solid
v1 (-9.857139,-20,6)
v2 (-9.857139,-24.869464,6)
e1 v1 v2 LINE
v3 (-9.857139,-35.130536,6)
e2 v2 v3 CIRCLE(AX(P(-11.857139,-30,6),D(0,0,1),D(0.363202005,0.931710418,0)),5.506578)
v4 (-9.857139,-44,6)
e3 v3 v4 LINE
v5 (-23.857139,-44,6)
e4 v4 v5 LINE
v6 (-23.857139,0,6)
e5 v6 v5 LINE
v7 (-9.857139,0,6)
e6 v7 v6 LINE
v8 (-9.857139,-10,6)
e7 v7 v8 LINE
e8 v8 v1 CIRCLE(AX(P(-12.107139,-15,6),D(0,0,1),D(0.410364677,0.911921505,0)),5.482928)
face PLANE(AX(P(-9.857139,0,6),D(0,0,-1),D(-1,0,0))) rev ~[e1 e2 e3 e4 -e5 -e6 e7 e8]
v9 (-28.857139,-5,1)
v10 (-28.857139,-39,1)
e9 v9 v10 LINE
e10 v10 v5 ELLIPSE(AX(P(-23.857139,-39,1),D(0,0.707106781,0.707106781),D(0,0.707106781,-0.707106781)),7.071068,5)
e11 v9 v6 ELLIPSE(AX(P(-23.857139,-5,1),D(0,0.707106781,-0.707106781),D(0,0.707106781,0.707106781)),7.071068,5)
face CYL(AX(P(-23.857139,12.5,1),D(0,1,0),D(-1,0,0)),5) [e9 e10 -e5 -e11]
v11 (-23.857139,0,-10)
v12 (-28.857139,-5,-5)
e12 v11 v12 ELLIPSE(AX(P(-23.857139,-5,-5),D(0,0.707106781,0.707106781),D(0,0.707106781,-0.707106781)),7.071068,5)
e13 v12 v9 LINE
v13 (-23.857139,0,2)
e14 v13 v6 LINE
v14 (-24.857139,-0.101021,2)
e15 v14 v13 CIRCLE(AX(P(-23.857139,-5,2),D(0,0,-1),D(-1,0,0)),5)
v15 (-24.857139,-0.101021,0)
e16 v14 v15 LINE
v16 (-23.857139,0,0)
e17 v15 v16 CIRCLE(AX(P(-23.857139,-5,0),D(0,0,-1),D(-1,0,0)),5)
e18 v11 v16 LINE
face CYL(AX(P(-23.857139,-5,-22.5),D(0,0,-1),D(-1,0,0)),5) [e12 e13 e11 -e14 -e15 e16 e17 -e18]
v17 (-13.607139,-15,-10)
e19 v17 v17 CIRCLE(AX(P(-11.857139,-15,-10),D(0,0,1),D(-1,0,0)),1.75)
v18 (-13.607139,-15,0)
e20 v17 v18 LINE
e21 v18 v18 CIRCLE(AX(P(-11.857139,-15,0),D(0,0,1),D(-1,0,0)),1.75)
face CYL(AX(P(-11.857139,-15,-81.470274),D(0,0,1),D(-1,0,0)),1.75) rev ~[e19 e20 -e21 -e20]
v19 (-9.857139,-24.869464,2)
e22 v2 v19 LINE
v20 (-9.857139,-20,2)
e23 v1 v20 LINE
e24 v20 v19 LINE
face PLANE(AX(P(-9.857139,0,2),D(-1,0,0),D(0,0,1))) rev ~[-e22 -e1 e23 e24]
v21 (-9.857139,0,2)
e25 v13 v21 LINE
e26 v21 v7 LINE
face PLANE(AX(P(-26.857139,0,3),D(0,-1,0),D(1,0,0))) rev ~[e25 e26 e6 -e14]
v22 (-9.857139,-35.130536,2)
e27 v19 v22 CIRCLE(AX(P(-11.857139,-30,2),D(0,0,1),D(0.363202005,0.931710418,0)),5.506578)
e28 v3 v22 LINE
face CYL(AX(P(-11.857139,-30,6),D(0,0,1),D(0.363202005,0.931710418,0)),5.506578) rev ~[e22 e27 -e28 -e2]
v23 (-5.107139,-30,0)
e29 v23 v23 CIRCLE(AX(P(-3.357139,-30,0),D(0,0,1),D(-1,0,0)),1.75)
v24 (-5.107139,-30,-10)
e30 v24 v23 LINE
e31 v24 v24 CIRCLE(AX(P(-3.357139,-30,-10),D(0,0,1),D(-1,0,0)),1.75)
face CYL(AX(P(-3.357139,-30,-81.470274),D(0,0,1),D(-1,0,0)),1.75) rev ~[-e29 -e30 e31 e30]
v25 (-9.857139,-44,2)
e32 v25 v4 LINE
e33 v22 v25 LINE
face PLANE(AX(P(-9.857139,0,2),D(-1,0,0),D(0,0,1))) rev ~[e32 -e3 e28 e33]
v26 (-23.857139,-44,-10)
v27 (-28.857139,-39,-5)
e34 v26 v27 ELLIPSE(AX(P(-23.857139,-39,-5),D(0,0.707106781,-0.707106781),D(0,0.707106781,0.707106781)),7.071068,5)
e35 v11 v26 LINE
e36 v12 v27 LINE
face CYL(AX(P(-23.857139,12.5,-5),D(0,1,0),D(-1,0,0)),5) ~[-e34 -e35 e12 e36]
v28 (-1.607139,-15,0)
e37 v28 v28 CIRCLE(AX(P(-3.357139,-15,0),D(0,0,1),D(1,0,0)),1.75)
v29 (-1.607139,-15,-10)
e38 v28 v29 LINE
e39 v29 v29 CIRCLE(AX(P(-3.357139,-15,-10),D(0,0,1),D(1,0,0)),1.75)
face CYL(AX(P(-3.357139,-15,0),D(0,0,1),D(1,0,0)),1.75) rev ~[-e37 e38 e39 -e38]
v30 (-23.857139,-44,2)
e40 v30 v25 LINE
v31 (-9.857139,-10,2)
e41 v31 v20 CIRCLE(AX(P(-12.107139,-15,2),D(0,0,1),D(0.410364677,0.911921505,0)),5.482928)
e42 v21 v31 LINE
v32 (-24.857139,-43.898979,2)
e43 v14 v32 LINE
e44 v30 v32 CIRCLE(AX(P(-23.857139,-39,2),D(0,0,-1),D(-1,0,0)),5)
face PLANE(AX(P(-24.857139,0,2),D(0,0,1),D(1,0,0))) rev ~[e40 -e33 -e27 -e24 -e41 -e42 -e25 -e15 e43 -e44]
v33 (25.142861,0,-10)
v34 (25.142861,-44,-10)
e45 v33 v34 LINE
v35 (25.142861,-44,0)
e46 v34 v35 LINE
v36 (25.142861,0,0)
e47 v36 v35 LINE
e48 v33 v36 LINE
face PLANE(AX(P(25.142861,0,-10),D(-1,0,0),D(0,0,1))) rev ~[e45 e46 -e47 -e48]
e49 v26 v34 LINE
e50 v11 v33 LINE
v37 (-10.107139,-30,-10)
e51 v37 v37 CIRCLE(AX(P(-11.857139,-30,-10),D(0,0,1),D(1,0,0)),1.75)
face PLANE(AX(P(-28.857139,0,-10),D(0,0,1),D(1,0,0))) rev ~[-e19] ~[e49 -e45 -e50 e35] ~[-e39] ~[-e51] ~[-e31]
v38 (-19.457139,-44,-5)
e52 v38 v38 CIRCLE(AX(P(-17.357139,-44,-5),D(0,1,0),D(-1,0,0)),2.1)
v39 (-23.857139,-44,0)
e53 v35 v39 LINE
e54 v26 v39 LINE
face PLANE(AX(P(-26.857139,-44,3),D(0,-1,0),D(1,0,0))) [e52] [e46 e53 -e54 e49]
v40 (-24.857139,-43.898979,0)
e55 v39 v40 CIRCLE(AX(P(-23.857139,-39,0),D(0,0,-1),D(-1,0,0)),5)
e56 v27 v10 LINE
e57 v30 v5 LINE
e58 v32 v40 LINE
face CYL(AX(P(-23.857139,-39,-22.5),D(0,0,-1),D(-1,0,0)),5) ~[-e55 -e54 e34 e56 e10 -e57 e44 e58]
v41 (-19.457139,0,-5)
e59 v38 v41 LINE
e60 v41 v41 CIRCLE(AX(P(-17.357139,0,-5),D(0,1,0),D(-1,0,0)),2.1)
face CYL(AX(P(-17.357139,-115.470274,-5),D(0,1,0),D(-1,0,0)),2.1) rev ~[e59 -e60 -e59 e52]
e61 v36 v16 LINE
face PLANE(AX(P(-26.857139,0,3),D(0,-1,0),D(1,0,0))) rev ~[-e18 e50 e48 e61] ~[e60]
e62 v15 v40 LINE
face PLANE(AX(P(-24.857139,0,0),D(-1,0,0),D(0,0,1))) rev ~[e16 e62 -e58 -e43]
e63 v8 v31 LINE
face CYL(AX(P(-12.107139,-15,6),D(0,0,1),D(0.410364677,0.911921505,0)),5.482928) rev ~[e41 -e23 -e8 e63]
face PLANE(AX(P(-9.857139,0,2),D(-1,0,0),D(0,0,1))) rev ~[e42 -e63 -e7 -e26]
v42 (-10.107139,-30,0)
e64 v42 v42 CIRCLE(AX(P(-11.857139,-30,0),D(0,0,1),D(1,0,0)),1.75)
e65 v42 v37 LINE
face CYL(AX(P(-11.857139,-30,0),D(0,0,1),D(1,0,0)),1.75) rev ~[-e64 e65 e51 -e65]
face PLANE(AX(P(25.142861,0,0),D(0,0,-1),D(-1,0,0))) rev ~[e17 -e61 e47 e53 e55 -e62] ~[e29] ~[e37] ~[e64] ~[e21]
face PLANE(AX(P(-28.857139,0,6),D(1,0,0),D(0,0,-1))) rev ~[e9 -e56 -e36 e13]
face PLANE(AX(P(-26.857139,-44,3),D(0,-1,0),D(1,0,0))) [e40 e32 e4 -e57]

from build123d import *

# Parameters (mm, degrees)
F0_W         = 15
F0_H         = 4
F1_DEPTH     = 44
F3_D         = 3.5
F4_R         = 1.75
F5_DEPTH     = 4
F7_D         = 4.2
F9_D         = 3.5
F9_DEPTH     = 10.001
F11_DEPTH    = 4
F12_T1_DEPTH = 69
F12_T3_DEPTH = 41


# Not quite as in the source:
# - a fillet or chamfer that OpenCascade refuses, or shapes differently, is made with other operations: its cross-section is extruded or revolved along the edge and cut away or added


with BuildPart() as f1:
    # F0 (on Front) → F1 (new body)
    with BuildSketch(Plane.XZ):
        Polygon((-28.8571389138, 6), (-28.8571389138, 0), (-24.8571389138, 0), (-24.8571389138, 2), (-24.8571389138, 6), align=None)
        Polygon((-24.8571389138, 0), (-28.8571389138, 0), (-28.8571389138, -10), (25.1428610862, -10), (25.1428610862, 0), align=None)
        with Locations((-17.3571389138, 4)):
            Rectangle(F0_W, F0_H)
    extrude(amount=F1_DEPTH)

    # F3 (through all)
    with Locations(Plane(origin=(0, 0, -10), x_dir=(1, 0, 0), z_dir=(0, 0, -1))):
        with Locations((-11.8571389138, 15), (-3.3571389138, 30)):
            Hole(F3_D / 2)

    # F4 (on face) → F5 (cut)
    with BuildSketch(Plane.XY.offset(6)):
        with BuildLine():
            Line((-9.8571389138, -20), (-9.8571389138, -10))
            ThreePointArc((-9.8571389138, -10), (-17.5900669637, -15), (-9.8571389138, -20))
        make_face()
        with Locations((-11.8571389138, -15)):
            Circle(F4_R, mode=Mode.SUBTRACT)
    extrude(amount=-F5_DEPTH, mode=Mode.SUBTRACT)

    # F7 (through all)
    with Locations(Plane.XZ.offset(44)):
        with Locations((-17.3571389138, -5)):
            Hole(F7_D / 2)

    # F9 (through all, one way)
    with BuildSketch(Plane.XY):
        with Locations((-3.3571389138, -15), (-11.8571389138, -30)):
            Circle(F9_D / 2)
    extrude(amount=-F9_DEPTH, mode=Mode.SUBTRACT)

    # F10 (on face) → F11 (cut, through all)
    with BuildSketch(Plane.XY.offset(6)):
        with BuildLine():
            Line((-9.8571389138, -35.1305356622), (-9.8571389138, -24.8694643378))
            ThreePointArc((-9.8571389138, -24.8694643378), (-17.3637164517, -30), (-9.8571389138, -35.1305356622))
        make_face()
    extrude(amount=-F11_DEPTH, mode=Mode.SUBTRACT)

    # F12: fillet of radius 5 on 4 edges, made by hand

    # F12_s2 → F12_t1 (cut)
    with BuildSketch(Plane.XZ.offset(-12.5)):
        with BuildLine():
            ThreePointArc((-28.8571389138, 1), (-27.3926728198, 4.5355339059), (-23.8571389138, 6))
            Line((-23.8571389138, 6), (-28.8571389138, 6))
            Line((-28.8571389138, 6), (-28.8571389138, 1))
        make_face()
        with BuildLine():
            ThreePointArc((-28.8571389138, -5), (-27.3926728198, -8.5355339059), (-23.8571389138, -10))
            Line((-23.8571389138, -10), (-28.8571389138, -10))
            Line((-28.8571389138, -10), (-28.8571389138, -5))
        make_face()
    extrude(amount=F12_T1_DEPTH, mode=Mode.SUBTRACT)

    # F12_s4 → F12_t3 (cut)
    with BuildSketch(Plane.XY.offset(-22.5)):
        with BuildLine():
            ThreePointArc((-28.8571389138, -5), (-27.3926728198, -1.4644660941), (-23.8571389138, 0))
            Line((-23.8571389138, 0), (-28.8571389138, 0))
            Line((-28.8571389138, 0), (-28.8571389138, -5))
        make_face()
        with BuildLine():
            ThreePointArc((-28.8571389138, -39), (-27.3926728198, -42.5355339059), (-23.8571389138, -44))
            Line((-23.8571389138, -44), (-28.8571389138, -44))
            Line((-28.8571389138, -44), (-28.8571389138, -39))
        make_face()
    extrude(amount=F12_T3_DEPTH, mode=Mode.SUBTRACT)


solid = f1.part
